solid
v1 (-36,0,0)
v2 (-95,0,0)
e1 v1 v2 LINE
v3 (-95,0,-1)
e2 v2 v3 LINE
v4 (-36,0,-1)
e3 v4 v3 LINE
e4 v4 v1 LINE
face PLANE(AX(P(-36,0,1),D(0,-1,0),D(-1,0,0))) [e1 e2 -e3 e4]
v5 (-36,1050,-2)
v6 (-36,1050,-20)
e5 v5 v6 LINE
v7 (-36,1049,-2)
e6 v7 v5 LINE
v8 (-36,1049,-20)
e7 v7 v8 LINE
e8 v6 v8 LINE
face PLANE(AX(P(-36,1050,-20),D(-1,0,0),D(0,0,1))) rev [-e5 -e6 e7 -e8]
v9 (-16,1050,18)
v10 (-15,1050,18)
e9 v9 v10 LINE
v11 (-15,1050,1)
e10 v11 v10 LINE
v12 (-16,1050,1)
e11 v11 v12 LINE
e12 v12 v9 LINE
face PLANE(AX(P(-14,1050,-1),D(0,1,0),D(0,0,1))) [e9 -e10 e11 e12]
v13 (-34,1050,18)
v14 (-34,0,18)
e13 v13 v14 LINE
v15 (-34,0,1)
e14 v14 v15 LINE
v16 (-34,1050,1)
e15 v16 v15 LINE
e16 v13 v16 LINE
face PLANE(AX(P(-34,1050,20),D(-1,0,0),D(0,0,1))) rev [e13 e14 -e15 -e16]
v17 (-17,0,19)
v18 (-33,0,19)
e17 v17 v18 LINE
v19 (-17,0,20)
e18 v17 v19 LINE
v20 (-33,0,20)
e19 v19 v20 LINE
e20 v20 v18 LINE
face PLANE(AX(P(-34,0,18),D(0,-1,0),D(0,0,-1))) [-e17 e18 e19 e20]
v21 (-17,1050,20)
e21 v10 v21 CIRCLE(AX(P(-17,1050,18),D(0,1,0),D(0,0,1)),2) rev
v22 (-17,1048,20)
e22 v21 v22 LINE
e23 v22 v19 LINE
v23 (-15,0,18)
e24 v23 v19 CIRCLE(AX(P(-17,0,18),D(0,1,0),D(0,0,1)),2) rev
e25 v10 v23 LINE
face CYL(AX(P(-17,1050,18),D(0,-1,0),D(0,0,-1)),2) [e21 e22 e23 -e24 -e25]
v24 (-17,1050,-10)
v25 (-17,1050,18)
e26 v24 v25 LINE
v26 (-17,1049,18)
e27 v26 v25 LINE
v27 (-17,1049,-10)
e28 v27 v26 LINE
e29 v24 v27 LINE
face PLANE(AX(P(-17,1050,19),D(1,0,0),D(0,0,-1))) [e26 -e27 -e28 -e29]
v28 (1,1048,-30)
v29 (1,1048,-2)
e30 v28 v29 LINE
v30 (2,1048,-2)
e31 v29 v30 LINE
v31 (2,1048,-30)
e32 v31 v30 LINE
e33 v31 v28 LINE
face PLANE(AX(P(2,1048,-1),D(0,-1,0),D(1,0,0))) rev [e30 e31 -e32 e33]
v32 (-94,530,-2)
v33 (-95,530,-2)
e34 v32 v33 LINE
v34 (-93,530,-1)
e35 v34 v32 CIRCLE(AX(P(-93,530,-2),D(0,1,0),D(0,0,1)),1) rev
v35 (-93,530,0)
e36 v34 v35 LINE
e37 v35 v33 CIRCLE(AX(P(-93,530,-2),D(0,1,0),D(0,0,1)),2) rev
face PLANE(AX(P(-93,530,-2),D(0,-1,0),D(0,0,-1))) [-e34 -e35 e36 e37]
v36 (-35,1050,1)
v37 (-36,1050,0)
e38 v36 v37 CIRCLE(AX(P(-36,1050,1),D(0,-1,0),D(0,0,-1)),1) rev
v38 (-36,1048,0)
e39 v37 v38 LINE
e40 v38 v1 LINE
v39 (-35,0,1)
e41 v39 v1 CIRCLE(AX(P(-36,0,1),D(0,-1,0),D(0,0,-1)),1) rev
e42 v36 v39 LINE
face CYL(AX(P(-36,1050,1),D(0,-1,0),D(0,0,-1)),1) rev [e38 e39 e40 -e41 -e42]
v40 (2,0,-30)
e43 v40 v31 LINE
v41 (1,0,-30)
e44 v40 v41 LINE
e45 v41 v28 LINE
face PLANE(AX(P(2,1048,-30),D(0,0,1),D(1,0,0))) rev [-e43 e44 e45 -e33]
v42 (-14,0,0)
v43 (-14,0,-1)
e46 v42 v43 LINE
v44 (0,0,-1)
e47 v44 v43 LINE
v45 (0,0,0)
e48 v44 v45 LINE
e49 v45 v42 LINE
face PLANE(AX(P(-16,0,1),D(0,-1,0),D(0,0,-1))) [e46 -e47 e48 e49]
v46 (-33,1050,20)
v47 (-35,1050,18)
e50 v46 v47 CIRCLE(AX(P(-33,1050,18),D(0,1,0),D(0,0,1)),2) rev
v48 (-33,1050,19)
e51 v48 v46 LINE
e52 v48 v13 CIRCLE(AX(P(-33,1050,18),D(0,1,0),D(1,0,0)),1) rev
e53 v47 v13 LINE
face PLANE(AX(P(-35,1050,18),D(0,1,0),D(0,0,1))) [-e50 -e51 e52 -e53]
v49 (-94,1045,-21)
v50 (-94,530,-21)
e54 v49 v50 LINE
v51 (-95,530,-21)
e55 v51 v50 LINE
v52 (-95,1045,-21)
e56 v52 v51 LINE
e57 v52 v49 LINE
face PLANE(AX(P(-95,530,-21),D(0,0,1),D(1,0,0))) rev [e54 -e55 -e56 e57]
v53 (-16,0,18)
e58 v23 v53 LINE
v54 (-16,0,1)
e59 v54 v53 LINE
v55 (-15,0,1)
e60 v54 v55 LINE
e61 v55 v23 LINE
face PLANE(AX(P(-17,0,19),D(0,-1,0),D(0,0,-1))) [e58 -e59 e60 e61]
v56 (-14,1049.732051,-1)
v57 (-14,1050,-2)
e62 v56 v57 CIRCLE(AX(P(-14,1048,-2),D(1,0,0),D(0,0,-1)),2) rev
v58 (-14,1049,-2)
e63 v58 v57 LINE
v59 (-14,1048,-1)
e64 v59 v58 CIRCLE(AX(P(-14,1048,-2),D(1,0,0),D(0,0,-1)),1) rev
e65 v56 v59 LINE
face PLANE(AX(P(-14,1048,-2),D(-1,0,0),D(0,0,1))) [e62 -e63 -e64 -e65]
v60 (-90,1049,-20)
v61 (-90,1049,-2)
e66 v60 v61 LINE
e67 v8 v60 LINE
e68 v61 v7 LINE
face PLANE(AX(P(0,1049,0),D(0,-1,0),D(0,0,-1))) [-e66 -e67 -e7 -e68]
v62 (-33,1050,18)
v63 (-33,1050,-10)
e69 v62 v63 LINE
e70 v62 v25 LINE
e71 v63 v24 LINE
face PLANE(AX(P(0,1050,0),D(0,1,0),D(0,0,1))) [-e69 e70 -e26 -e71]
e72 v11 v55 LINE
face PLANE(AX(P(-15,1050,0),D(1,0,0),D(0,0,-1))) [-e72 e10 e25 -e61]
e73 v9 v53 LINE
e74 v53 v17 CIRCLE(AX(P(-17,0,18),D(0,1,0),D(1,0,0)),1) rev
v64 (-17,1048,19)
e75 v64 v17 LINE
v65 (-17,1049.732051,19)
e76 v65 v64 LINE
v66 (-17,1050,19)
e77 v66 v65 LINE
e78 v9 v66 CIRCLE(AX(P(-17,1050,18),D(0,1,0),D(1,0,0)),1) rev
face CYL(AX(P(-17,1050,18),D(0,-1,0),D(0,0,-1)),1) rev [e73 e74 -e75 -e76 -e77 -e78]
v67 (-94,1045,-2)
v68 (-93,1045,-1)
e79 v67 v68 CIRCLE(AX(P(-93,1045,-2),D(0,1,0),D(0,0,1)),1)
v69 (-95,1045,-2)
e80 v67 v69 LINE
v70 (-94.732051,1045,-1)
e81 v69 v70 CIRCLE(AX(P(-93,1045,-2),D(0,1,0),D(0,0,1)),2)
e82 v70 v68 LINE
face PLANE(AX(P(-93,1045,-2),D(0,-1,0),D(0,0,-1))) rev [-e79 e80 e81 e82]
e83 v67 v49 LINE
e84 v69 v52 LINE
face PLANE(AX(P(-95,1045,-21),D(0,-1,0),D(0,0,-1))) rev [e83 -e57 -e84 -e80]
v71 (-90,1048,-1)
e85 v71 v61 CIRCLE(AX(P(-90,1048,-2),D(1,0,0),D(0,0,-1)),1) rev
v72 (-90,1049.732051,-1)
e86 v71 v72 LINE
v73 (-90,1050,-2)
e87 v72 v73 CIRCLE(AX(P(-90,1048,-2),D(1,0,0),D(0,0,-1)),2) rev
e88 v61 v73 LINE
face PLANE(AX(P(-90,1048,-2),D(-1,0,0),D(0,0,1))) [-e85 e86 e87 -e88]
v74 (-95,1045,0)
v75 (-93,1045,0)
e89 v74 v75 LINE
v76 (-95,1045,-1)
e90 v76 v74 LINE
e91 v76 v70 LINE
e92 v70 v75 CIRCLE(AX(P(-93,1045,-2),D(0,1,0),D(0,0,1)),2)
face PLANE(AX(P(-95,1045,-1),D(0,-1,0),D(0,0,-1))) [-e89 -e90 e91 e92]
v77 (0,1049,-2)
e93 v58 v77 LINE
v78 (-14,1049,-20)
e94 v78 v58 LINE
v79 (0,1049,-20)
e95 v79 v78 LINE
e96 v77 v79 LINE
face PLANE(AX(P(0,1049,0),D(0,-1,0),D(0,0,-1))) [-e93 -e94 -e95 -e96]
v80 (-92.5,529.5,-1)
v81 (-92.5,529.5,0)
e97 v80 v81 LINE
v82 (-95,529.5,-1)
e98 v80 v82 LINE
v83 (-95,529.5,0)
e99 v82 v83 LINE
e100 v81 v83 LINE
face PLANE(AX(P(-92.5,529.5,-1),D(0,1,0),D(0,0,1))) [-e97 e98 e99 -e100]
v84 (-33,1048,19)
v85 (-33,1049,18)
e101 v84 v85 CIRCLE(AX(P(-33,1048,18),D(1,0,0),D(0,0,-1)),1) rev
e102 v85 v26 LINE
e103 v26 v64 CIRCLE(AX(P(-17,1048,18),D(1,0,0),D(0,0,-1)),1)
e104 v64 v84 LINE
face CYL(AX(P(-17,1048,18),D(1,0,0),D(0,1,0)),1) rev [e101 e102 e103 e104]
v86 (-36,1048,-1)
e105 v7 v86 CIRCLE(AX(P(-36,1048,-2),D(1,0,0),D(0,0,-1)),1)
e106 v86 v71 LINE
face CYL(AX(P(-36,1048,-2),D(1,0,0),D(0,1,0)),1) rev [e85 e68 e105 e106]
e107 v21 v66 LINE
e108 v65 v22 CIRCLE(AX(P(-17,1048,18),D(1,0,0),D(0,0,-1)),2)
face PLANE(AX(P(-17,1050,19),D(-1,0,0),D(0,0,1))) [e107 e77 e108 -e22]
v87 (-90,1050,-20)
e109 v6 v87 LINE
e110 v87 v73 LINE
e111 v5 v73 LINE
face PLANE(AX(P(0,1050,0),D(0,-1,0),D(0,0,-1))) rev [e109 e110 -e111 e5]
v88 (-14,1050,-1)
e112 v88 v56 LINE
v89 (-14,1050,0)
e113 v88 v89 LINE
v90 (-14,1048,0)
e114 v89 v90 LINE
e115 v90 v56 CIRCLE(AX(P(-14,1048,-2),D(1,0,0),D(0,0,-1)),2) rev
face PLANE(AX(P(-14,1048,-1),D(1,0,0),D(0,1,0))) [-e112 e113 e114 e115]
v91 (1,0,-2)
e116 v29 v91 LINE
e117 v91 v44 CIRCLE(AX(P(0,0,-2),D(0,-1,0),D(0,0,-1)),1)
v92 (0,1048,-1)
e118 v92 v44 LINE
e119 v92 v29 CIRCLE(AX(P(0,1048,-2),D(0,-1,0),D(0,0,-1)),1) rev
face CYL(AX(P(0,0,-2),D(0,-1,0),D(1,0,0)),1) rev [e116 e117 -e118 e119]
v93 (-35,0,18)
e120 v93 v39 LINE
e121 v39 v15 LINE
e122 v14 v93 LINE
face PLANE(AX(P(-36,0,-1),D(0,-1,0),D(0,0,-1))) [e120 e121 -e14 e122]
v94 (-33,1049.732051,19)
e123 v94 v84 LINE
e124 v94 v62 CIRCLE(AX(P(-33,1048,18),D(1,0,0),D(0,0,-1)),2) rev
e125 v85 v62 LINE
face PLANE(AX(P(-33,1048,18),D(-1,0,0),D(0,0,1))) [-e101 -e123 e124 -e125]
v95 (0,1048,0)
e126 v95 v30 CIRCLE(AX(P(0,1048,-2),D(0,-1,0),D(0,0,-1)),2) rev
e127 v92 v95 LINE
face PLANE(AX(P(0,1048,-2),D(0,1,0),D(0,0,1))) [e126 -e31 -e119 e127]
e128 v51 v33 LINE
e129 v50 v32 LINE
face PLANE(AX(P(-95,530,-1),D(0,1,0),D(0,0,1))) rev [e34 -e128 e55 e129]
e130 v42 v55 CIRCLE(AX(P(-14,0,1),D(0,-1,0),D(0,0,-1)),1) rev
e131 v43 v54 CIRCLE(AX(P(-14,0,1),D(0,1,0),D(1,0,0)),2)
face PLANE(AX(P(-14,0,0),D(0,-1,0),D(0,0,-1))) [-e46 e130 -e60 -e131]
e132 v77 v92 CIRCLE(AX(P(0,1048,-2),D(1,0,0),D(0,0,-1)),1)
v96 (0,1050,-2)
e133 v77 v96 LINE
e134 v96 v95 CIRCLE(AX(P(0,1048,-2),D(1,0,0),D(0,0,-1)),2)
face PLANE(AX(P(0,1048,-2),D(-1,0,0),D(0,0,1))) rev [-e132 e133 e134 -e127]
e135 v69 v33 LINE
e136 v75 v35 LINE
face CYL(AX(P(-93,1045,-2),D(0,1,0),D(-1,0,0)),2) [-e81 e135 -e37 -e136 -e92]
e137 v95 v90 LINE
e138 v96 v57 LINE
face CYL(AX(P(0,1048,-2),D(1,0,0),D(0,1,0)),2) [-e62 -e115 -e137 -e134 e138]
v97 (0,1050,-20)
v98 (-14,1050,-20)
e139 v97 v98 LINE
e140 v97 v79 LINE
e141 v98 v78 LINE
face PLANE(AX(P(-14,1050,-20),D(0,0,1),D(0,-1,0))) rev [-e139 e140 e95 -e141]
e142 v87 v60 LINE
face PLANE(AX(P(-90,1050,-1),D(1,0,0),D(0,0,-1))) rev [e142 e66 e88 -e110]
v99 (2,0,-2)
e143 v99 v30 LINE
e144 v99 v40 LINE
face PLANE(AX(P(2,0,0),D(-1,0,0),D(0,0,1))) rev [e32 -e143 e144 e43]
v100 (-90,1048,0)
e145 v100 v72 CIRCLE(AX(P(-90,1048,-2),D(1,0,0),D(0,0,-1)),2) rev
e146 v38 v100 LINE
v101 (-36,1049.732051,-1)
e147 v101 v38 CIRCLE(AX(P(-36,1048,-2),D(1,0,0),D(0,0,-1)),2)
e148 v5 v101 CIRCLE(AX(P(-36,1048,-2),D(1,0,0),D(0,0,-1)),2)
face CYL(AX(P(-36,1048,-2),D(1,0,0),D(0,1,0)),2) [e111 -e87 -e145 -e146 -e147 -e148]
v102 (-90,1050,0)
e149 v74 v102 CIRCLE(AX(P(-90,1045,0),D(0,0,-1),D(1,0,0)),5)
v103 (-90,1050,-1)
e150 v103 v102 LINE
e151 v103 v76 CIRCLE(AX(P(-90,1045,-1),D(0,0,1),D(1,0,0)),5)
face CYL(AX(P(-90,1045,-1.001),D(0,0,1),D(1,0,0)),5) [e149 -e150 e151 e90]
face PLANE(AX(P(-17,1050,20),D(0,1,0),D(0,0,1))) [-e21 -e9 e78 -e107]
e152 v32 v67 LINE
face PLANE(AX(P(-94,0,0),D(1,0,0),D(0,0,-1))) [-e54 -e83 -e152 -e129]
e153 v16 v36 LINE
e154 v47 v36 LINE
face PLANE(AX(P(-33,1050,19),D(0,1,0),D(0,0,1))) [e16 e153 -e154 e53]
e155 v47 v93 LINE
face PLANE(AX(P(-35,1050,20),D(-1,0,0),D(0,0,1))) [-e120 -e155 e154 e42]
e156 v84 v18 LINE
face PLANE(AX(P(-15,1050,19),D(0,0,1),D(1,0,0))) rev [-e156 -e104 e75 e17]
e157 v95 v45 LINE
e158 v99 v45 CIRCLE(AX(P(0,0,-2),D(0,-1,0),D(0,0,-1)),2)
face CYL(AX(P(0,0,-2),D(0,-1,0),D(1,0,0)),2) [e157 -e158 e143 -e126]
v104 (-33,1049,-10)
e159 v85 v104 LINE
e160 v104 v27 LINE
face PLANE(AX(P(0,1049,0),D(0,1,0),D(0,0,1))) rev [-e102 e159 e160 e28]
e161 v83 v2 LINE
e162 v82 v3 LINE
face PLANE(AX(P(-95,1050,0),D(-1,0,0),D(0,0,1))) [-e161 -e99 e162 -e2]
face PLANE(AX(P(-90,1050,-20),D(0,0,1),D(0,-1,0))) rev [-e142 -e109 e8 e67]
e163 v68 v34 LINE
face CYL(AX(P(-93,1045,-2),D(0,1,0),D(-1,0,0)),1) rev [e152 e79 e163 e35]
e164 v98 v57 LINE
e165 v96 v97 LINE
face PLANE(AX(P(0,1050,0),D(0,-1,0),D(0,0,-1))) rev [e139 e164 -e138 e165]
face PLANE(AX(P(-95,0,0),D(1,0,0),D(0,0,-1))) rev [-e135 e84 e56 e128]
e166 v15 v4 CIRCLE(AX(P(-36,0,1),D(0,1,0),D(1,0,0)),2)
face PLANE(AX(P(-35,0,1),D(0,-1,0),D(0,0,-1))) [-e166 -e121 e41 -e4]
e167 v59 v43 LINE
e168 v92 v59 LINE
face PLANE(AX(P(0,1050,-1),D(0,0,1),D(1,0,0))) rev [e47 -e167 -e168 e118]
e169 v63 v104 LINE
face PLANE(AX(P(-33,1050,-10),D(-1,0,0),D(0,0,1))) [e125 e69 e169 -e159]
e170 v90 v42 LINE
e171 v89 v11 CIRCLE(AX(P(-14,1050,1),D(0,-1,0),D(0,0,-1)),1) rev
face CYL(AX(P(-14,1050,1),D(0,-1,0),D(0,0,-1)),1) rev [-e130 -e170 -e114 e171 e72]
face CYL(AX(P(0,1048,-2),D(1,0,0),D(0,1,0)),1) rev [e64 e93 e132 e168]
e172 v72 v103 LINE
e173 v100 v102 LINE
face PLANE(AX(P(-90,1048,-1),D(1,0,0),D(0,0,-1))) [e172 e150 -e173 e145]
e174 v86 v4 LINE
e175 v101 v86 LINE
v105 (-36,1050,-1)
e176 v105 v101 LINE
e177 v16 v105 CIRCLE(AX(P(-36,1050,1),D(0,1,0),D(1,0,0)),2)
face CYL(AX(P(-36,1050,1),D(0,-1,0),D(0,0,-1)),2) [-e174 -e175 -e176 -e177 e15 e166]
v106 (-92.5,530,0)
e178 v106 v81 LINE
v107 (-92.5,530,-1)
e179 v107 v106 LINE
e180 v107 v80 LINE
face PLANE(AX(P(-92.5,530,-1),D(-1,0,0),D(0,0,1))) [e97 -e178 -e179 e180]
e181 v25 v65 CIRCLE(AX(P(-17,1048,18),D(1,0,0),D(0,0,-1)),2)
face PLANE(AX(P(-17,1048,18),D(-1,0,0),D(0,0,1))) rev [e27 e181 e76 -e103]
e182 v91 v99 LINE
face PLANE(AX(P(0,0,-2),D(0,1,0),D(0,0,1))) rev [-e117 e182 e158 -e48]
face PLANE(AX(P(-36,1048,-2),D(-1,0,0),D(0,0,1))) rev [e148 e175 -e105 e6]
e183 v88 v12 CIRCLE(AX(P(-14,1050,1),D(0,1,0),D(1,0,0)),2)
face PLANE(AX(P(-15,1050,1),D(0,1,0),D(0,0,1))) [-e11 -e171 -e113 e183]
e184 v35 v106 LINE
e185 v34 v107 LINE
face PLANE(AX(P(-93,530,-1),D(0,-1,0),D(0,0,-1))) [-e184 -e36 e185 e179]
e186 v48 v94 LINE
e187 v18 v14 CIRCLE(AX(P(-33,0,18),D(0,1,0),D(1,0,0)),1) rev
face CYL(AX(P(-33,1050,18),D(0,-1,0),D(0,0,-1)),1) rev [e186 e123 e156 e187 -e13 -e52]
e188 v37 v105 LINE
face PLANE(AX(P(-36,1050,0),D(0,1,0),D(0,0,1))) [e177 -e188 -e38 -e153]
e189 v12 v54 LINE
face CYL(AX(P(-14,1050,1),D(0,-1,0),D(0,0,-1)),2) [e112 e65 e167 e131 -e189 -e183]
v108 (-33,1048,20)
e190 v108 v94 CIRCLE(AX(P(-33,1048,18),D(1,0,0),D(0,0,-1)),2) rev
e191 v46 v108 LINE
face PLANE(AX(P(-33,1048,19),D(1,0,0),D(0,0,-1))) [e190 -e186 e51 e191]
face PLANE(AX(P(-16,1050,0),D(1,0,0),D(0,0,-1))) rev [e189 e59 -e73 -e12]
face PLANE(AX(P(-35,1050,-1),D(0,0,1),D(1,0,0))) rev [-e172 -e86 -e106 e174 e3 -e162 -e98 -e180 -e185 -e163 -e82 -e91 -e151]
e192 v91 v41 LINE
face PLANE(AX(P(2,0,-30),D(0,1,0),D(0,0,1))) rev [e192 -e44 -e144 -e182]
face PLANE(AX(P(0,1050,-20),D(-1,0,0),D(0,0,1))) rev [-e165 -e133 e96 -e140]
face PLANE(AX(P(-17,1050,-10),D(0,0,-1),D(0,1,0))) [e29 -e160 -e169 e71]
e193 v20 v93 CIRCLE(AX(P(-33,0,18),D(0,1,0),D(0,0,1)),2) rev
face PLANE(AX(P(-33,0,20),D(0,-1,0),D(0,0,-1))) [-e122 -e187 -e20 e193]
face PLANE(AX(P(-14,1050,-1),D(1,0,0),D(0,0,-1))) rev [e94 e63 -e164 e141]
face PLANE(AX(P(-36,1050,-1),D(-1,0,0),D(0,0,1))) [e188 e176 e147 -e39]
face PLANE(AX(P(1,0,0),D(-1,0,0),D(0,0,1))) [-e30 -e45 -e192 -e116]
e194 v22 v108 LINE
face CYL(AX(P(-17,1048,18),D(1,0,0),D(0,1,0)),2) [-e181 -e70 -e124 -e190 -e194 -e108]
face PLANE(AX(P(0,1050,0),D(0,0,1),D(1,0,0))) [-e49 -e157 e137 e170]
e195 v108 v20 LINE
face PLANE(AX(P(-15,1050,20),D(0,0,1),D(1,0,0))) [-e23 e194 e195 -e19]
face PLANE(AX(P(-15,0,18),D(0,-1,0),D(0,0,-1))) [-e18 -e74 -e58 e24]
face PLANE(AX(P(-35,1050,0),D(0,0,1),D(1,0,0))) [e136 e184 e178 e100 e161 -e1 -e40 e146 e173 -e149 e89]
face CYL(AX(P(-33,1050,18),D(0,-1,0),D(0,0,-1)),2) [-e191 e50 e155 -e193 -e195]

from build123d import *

# Parameters (mm, degrees)
BASE_FLANGE1_DEPTH             = 1050
CUT_EXTRUDE1_REACH             = 1056.479
EDGE_FLANGE5_STRIP_W           = 16
EDGE_FLANGE5_STRIP_H           = 1
EDGE_FLANGE5_STRIP_CUT_DEPTH   = 54
EDGE_FLANGE5_STRIP_2_W         = 16
EDGE_FLANGE5_STRIP_2_H         = 1
EDGE_FLANGE5_STRIP_CUT_2_DEPTH = 14
EDGE_FLANGE5_DEPTH             = 54
EDGE_FLANGE5_BEND_DEPTH        = 14
EDGE_FLANGE7_DEPTH             = 1048
EDGE_FLANGE8_STRIP_W           = 6
EDGE_FLANGE8_STRIP_H           = 1
EDGE_FLANGE8_STRIP_CUT_DEPTH   = 16
EDGE_FLANGE8_DEPTH             = 16
EDGE_FLANGE9_START             = 529.5
EDGE_FLANGE9_DEPTH             = 515.5
EDGE_FLANGE9_2_DEPTH           = 0.5
EDGE_FLANGE9_START_2           = 530
EDGE_FLANGE9_3_DEPTH           = 515


# Read off the part's stored shape, not the designer's step: Edge-Flange9
# Sheet-metal steps are written as plain solids
with BuildPart() as part:
    # Sketch1 → Base-Flange1 (new body)
    with BuildSketch(Plane(origin=(0, 0, 0), x_dir=(1, 0, 0), z_dir=(0, 1, 0))):
        with BuildLine():
            Line((0, 0), (-14, 0))
            ThreePointArc((-14, 0), (-14.707106781, -0.292893219), (-15, -1))
            Line((-15, -1), (-15, -18))
            ThreePointArc((-15, -18), (-15.585786438, -19.414213562), (-17, -20))
            Line((-17, -20), (-33, -20))
            ThreePointArc((-33, -20), (-34.414213562, -19.414213562), (-35, -18))
            Line((-35, -18), (-35, -1))
            ThreePointArc((-35, -1), (-35.292893219, -0.292893219), (-36, 0))
            Line((-36, 0), (-95, 0))
            Line((-95, 0), (-95, 1))
            Line((-95, 1), (-36, 1))
            ThreePointArc((-36, 1), (-34.585786438, 0.414213562), (-34, -1))
            Line((-34, -1), (-34, -18))
            ThreePointArc((-34, -18), (-33.707106781, -18.707106781), (-33, -19))
            Line((-33, -19), (-17, -19))
            ThreePointArc((-17, -19), (-16.292893219, -18.707106781), (-16, -18))
            Line((-16, -18), (-16, -1))
            ThreePointArc((-16, -1), (-15.414213562, 0.414213562), (-14, 1))
            Line((-14, 1), (0, 1))
            Line((0, 1), (0, 0))
        make_face()
    extrude(amount=BASE_FLANGE1_DEPTH)

    # Sketch18 → Cut-Extrude1 (cut, up to next)
    with BuildSketch(Plane.XY, mode=Mode.PRIVATE) as cut_extrude1_sk1:
        with BuildLine():
            Line((-95, 1045), (-95, 1050))
            Line((-95, 1050), (-90, 1050))
            ThreePointArc((-90, 1050), (-93.535533906, 1048.535533906), (-95, 1045))
        make_face()
    cut_extrude1_tool1 = extrude(cut_extrude1_sk1.sketch, amount=-CUT_EXTRUDE1_REACH, mode=Mode.PRIVATE) & part.part
    add(cut_extrude1_tool1.solids().sort_by_distance((-93.88316, 1048.88316, 0))[0], mode=Mode.SUBTRACT)

    # Edge-Flange5 strip (across the edge) → Edge-Flange5 strip cut (cut)
    with BuildSketch(Plane(origin=(-90, 1050, -1), x_dir=(0, -1, 0), z_dir=(1, 0, 0))):
        with Locations((-6, -0.5)):
            Rectangle(EDGE_FLANGE5_STRIP_W, EDGE_FLANGE5_STRIP_H)
    extrude(amount=EDGE_FLANGE5_STRIP_CUT_DEPTH, mode=Mode.SUBTRACT)

    # Edge-Flange5 strip 2 (across the edge) → Edge-Flange5 strip cut 2 (cut)
    with BuildSketch(Plane(origin=(-14, 1050, -1), x_dir=(0, -1, 0), z_dir=(1, 0, 0))):
        with Locations((-6, -0.5)):
            Rectangle(EDGE_FLANGE5_STRIP_2_W, EDGE_FLANGE5_STRIP_2_H)
    extrude(amount=EDGE_FLANGE5_STRIP_CUT_2_DEPTH, mode=Mode.SUBTRACT)

    # Edge-Flange5 section (across the edge) → Edge-Flange5 (add)
    with BuildSketch(Plane(origin=(-90, 1050, -1), x_dir=(0, -1, 0), z_dir=(1, 0, 0))):
        with BuildLine():
            Line((0, 1), (0, 19))
            Line((0, 19), (1, 19))
            Line((1, 19), (1, 1))
            ThreePointArc((1, 1), (1.292893219, 0.292893219), (2, 0))
            Line((2, 0), (2, -1))
            ThreePointArc((2, -1), (0.585786438, -0.414213562), (0, 1))
        make_face()
    extrude(amount=EDGE_FLANGE5_DEPTH)

    # Edge-Flange5 section 2 (across the edge) → Edge-Flange5 bend (add)
    with BuildSketch(Plane(origin=(-14, 1050, -1), x_dir=(0, -1, 0), z_dir=(1, 0, 0))):
        with BuildLine():
            Line((0, 1), (0, 19))
            Line((0, 19), (1, 19))
            Line((1, 19), (1, 1))
            ThreePointArc((1, 1), (1.292893219, 0.292893219), (2, 0))
            Line((2, 0), (2, -1))
            ThreePointArc((2, -1), (0.585786438, -0.414213562), (0, 1))
        make_face()
    extrude(amount=EDGE_FLANGE5_BEND_DEPTH)

    # Edge-Flange7 section (across the edge) → Edge-Flange7 (add)
    with BuildSketch(Plane(origin=(1, 1048, -1), x_dir=(-1, 0, 0), z_dir=(0, -1, 0))):
        with BuildLine():
            Line((-1, 1), (-1, 29))
            Line((-1, 29), (0, 29))
            Line((0, 29), (0, 1))
            ThreePointArc((0, 1), (0.292893219, 0.292893219), (1, 0))
            Line((1, 0), (1, -1))
            ThreePointArc((1, -1), (-0.414213562, -0.414213562), (-1, 1))
        make_face()
    extrude(amount=EDGE_FLANGE7_DEPTH)

    # Edge-Flange8 strip (across the edge) → Edge-Flange8 strip cut (cut)
    with BuildSketch(Plane(origin=(-33, 1050, 19), x_dir=(0, -1, 0), z_dir=(1, 0, 0))):
        with Locations((-1, -0.5)):
            Rectangle(EDGE_FLANGE8_STRIP_W, EDGE_FLANGE8_STRIP_H)
    extrude(amount=EDGE_FLANGE8_STRIP_CUT_DEPTH, mode=Mode.SUBTRACT)

    # Edge-Flange8 section (across the edge) → Edge-Flange8 (add)
    with BuildSketch(Plane(origin=(-33, 1050, 19), x_dir=(0, -1, 0), z_dir=(1, 0, 0))):
        with BuildLine():
            Line((0, 1), (0, 29))
            Line((0, 29), (1, 29))
            Line((1, 29), (1, 1))
            ThreePointArc((1, 1), (1.292893219, 0.292893219), (2, 0))
            Line((2, 0), (2, -1))
            ThreePointArc((2, -1), (0.585786438, -0.414213562), (0, 1))
        make_face()
    extrude(amount=EDGE_FLANGE8_DEPTH)

    # Edge-Flange9 outline → Edge-Flange9 (cut)
    with BuildSketch(Plane(origin=(0, 0, 0), x_dir=(1, 0, 0), z_dir=(0, 1, 0)).offset(EDGE_FLANGE9_START)):
        with BuildLine():
            ThreePointArc((-93, 0), (-94, 0.267949193), (-94.732050807, 1))
            Line((-94.732050807, 1), (-95, 1))
            Line((-95, 1), (-95, 0))
            Line((-95, 0), (-93, 0))
        make_face()
    extrude(amount=EDGE_FLANGE9_DEPTH, mode=Mode.SUBTRACT)

    # Edge-Flange9 2 outline → Edge-Flange9 2 (cut)
    with BuildSketch(Plane(origin=(0, 0, 0), x_dir=(1, 0, 0), z_dir=(0, 1, 0)).offset(EDGE_FLANGE9_START)):
        with BuildLine():
            Line((-92.5, 1), (-94.732050807, 1))
            ThreePointArc((-94.732050807, 1), (-94, 0.267949193), (-93, 0))
            Line((-93, 0), (-92.5, 0))
            Line((-92.5, 0), (-92.5, 1))
        make_face()
    extrude(amount=EDGE_FLANGE9_2_DEPTH, mode=Mode.SUBTRACT)

    # Edge-Flange9 3 outline → Edge-Flange9 3 (add)
    with BuildSketch(Plane(origin=(0, 0, 0), x_dir=(1, 0, 0), z_dir=(0, 1, 0)).offset(EDGE_FLANGE9_START_2)):
        with BuildLine():
            Line((-95, 21), (-95, 2))
            ThreePointArc((-95, 2), (-94.931851652, 1.48236191), (-94.732050807, 1))
            Line((-94.732050807, 1), (-93, 1))
            ThreePointArc((-93, 1), (-93.707106781, 1.292893219), (-94, 2))
            Line((-94, 2), (-94, 21))
            Line((-94, 21), (-95, 21))
        make_face()
    extrude(amount=EDGE_FLANGE9_3_DEPTH)


solid = part.part
